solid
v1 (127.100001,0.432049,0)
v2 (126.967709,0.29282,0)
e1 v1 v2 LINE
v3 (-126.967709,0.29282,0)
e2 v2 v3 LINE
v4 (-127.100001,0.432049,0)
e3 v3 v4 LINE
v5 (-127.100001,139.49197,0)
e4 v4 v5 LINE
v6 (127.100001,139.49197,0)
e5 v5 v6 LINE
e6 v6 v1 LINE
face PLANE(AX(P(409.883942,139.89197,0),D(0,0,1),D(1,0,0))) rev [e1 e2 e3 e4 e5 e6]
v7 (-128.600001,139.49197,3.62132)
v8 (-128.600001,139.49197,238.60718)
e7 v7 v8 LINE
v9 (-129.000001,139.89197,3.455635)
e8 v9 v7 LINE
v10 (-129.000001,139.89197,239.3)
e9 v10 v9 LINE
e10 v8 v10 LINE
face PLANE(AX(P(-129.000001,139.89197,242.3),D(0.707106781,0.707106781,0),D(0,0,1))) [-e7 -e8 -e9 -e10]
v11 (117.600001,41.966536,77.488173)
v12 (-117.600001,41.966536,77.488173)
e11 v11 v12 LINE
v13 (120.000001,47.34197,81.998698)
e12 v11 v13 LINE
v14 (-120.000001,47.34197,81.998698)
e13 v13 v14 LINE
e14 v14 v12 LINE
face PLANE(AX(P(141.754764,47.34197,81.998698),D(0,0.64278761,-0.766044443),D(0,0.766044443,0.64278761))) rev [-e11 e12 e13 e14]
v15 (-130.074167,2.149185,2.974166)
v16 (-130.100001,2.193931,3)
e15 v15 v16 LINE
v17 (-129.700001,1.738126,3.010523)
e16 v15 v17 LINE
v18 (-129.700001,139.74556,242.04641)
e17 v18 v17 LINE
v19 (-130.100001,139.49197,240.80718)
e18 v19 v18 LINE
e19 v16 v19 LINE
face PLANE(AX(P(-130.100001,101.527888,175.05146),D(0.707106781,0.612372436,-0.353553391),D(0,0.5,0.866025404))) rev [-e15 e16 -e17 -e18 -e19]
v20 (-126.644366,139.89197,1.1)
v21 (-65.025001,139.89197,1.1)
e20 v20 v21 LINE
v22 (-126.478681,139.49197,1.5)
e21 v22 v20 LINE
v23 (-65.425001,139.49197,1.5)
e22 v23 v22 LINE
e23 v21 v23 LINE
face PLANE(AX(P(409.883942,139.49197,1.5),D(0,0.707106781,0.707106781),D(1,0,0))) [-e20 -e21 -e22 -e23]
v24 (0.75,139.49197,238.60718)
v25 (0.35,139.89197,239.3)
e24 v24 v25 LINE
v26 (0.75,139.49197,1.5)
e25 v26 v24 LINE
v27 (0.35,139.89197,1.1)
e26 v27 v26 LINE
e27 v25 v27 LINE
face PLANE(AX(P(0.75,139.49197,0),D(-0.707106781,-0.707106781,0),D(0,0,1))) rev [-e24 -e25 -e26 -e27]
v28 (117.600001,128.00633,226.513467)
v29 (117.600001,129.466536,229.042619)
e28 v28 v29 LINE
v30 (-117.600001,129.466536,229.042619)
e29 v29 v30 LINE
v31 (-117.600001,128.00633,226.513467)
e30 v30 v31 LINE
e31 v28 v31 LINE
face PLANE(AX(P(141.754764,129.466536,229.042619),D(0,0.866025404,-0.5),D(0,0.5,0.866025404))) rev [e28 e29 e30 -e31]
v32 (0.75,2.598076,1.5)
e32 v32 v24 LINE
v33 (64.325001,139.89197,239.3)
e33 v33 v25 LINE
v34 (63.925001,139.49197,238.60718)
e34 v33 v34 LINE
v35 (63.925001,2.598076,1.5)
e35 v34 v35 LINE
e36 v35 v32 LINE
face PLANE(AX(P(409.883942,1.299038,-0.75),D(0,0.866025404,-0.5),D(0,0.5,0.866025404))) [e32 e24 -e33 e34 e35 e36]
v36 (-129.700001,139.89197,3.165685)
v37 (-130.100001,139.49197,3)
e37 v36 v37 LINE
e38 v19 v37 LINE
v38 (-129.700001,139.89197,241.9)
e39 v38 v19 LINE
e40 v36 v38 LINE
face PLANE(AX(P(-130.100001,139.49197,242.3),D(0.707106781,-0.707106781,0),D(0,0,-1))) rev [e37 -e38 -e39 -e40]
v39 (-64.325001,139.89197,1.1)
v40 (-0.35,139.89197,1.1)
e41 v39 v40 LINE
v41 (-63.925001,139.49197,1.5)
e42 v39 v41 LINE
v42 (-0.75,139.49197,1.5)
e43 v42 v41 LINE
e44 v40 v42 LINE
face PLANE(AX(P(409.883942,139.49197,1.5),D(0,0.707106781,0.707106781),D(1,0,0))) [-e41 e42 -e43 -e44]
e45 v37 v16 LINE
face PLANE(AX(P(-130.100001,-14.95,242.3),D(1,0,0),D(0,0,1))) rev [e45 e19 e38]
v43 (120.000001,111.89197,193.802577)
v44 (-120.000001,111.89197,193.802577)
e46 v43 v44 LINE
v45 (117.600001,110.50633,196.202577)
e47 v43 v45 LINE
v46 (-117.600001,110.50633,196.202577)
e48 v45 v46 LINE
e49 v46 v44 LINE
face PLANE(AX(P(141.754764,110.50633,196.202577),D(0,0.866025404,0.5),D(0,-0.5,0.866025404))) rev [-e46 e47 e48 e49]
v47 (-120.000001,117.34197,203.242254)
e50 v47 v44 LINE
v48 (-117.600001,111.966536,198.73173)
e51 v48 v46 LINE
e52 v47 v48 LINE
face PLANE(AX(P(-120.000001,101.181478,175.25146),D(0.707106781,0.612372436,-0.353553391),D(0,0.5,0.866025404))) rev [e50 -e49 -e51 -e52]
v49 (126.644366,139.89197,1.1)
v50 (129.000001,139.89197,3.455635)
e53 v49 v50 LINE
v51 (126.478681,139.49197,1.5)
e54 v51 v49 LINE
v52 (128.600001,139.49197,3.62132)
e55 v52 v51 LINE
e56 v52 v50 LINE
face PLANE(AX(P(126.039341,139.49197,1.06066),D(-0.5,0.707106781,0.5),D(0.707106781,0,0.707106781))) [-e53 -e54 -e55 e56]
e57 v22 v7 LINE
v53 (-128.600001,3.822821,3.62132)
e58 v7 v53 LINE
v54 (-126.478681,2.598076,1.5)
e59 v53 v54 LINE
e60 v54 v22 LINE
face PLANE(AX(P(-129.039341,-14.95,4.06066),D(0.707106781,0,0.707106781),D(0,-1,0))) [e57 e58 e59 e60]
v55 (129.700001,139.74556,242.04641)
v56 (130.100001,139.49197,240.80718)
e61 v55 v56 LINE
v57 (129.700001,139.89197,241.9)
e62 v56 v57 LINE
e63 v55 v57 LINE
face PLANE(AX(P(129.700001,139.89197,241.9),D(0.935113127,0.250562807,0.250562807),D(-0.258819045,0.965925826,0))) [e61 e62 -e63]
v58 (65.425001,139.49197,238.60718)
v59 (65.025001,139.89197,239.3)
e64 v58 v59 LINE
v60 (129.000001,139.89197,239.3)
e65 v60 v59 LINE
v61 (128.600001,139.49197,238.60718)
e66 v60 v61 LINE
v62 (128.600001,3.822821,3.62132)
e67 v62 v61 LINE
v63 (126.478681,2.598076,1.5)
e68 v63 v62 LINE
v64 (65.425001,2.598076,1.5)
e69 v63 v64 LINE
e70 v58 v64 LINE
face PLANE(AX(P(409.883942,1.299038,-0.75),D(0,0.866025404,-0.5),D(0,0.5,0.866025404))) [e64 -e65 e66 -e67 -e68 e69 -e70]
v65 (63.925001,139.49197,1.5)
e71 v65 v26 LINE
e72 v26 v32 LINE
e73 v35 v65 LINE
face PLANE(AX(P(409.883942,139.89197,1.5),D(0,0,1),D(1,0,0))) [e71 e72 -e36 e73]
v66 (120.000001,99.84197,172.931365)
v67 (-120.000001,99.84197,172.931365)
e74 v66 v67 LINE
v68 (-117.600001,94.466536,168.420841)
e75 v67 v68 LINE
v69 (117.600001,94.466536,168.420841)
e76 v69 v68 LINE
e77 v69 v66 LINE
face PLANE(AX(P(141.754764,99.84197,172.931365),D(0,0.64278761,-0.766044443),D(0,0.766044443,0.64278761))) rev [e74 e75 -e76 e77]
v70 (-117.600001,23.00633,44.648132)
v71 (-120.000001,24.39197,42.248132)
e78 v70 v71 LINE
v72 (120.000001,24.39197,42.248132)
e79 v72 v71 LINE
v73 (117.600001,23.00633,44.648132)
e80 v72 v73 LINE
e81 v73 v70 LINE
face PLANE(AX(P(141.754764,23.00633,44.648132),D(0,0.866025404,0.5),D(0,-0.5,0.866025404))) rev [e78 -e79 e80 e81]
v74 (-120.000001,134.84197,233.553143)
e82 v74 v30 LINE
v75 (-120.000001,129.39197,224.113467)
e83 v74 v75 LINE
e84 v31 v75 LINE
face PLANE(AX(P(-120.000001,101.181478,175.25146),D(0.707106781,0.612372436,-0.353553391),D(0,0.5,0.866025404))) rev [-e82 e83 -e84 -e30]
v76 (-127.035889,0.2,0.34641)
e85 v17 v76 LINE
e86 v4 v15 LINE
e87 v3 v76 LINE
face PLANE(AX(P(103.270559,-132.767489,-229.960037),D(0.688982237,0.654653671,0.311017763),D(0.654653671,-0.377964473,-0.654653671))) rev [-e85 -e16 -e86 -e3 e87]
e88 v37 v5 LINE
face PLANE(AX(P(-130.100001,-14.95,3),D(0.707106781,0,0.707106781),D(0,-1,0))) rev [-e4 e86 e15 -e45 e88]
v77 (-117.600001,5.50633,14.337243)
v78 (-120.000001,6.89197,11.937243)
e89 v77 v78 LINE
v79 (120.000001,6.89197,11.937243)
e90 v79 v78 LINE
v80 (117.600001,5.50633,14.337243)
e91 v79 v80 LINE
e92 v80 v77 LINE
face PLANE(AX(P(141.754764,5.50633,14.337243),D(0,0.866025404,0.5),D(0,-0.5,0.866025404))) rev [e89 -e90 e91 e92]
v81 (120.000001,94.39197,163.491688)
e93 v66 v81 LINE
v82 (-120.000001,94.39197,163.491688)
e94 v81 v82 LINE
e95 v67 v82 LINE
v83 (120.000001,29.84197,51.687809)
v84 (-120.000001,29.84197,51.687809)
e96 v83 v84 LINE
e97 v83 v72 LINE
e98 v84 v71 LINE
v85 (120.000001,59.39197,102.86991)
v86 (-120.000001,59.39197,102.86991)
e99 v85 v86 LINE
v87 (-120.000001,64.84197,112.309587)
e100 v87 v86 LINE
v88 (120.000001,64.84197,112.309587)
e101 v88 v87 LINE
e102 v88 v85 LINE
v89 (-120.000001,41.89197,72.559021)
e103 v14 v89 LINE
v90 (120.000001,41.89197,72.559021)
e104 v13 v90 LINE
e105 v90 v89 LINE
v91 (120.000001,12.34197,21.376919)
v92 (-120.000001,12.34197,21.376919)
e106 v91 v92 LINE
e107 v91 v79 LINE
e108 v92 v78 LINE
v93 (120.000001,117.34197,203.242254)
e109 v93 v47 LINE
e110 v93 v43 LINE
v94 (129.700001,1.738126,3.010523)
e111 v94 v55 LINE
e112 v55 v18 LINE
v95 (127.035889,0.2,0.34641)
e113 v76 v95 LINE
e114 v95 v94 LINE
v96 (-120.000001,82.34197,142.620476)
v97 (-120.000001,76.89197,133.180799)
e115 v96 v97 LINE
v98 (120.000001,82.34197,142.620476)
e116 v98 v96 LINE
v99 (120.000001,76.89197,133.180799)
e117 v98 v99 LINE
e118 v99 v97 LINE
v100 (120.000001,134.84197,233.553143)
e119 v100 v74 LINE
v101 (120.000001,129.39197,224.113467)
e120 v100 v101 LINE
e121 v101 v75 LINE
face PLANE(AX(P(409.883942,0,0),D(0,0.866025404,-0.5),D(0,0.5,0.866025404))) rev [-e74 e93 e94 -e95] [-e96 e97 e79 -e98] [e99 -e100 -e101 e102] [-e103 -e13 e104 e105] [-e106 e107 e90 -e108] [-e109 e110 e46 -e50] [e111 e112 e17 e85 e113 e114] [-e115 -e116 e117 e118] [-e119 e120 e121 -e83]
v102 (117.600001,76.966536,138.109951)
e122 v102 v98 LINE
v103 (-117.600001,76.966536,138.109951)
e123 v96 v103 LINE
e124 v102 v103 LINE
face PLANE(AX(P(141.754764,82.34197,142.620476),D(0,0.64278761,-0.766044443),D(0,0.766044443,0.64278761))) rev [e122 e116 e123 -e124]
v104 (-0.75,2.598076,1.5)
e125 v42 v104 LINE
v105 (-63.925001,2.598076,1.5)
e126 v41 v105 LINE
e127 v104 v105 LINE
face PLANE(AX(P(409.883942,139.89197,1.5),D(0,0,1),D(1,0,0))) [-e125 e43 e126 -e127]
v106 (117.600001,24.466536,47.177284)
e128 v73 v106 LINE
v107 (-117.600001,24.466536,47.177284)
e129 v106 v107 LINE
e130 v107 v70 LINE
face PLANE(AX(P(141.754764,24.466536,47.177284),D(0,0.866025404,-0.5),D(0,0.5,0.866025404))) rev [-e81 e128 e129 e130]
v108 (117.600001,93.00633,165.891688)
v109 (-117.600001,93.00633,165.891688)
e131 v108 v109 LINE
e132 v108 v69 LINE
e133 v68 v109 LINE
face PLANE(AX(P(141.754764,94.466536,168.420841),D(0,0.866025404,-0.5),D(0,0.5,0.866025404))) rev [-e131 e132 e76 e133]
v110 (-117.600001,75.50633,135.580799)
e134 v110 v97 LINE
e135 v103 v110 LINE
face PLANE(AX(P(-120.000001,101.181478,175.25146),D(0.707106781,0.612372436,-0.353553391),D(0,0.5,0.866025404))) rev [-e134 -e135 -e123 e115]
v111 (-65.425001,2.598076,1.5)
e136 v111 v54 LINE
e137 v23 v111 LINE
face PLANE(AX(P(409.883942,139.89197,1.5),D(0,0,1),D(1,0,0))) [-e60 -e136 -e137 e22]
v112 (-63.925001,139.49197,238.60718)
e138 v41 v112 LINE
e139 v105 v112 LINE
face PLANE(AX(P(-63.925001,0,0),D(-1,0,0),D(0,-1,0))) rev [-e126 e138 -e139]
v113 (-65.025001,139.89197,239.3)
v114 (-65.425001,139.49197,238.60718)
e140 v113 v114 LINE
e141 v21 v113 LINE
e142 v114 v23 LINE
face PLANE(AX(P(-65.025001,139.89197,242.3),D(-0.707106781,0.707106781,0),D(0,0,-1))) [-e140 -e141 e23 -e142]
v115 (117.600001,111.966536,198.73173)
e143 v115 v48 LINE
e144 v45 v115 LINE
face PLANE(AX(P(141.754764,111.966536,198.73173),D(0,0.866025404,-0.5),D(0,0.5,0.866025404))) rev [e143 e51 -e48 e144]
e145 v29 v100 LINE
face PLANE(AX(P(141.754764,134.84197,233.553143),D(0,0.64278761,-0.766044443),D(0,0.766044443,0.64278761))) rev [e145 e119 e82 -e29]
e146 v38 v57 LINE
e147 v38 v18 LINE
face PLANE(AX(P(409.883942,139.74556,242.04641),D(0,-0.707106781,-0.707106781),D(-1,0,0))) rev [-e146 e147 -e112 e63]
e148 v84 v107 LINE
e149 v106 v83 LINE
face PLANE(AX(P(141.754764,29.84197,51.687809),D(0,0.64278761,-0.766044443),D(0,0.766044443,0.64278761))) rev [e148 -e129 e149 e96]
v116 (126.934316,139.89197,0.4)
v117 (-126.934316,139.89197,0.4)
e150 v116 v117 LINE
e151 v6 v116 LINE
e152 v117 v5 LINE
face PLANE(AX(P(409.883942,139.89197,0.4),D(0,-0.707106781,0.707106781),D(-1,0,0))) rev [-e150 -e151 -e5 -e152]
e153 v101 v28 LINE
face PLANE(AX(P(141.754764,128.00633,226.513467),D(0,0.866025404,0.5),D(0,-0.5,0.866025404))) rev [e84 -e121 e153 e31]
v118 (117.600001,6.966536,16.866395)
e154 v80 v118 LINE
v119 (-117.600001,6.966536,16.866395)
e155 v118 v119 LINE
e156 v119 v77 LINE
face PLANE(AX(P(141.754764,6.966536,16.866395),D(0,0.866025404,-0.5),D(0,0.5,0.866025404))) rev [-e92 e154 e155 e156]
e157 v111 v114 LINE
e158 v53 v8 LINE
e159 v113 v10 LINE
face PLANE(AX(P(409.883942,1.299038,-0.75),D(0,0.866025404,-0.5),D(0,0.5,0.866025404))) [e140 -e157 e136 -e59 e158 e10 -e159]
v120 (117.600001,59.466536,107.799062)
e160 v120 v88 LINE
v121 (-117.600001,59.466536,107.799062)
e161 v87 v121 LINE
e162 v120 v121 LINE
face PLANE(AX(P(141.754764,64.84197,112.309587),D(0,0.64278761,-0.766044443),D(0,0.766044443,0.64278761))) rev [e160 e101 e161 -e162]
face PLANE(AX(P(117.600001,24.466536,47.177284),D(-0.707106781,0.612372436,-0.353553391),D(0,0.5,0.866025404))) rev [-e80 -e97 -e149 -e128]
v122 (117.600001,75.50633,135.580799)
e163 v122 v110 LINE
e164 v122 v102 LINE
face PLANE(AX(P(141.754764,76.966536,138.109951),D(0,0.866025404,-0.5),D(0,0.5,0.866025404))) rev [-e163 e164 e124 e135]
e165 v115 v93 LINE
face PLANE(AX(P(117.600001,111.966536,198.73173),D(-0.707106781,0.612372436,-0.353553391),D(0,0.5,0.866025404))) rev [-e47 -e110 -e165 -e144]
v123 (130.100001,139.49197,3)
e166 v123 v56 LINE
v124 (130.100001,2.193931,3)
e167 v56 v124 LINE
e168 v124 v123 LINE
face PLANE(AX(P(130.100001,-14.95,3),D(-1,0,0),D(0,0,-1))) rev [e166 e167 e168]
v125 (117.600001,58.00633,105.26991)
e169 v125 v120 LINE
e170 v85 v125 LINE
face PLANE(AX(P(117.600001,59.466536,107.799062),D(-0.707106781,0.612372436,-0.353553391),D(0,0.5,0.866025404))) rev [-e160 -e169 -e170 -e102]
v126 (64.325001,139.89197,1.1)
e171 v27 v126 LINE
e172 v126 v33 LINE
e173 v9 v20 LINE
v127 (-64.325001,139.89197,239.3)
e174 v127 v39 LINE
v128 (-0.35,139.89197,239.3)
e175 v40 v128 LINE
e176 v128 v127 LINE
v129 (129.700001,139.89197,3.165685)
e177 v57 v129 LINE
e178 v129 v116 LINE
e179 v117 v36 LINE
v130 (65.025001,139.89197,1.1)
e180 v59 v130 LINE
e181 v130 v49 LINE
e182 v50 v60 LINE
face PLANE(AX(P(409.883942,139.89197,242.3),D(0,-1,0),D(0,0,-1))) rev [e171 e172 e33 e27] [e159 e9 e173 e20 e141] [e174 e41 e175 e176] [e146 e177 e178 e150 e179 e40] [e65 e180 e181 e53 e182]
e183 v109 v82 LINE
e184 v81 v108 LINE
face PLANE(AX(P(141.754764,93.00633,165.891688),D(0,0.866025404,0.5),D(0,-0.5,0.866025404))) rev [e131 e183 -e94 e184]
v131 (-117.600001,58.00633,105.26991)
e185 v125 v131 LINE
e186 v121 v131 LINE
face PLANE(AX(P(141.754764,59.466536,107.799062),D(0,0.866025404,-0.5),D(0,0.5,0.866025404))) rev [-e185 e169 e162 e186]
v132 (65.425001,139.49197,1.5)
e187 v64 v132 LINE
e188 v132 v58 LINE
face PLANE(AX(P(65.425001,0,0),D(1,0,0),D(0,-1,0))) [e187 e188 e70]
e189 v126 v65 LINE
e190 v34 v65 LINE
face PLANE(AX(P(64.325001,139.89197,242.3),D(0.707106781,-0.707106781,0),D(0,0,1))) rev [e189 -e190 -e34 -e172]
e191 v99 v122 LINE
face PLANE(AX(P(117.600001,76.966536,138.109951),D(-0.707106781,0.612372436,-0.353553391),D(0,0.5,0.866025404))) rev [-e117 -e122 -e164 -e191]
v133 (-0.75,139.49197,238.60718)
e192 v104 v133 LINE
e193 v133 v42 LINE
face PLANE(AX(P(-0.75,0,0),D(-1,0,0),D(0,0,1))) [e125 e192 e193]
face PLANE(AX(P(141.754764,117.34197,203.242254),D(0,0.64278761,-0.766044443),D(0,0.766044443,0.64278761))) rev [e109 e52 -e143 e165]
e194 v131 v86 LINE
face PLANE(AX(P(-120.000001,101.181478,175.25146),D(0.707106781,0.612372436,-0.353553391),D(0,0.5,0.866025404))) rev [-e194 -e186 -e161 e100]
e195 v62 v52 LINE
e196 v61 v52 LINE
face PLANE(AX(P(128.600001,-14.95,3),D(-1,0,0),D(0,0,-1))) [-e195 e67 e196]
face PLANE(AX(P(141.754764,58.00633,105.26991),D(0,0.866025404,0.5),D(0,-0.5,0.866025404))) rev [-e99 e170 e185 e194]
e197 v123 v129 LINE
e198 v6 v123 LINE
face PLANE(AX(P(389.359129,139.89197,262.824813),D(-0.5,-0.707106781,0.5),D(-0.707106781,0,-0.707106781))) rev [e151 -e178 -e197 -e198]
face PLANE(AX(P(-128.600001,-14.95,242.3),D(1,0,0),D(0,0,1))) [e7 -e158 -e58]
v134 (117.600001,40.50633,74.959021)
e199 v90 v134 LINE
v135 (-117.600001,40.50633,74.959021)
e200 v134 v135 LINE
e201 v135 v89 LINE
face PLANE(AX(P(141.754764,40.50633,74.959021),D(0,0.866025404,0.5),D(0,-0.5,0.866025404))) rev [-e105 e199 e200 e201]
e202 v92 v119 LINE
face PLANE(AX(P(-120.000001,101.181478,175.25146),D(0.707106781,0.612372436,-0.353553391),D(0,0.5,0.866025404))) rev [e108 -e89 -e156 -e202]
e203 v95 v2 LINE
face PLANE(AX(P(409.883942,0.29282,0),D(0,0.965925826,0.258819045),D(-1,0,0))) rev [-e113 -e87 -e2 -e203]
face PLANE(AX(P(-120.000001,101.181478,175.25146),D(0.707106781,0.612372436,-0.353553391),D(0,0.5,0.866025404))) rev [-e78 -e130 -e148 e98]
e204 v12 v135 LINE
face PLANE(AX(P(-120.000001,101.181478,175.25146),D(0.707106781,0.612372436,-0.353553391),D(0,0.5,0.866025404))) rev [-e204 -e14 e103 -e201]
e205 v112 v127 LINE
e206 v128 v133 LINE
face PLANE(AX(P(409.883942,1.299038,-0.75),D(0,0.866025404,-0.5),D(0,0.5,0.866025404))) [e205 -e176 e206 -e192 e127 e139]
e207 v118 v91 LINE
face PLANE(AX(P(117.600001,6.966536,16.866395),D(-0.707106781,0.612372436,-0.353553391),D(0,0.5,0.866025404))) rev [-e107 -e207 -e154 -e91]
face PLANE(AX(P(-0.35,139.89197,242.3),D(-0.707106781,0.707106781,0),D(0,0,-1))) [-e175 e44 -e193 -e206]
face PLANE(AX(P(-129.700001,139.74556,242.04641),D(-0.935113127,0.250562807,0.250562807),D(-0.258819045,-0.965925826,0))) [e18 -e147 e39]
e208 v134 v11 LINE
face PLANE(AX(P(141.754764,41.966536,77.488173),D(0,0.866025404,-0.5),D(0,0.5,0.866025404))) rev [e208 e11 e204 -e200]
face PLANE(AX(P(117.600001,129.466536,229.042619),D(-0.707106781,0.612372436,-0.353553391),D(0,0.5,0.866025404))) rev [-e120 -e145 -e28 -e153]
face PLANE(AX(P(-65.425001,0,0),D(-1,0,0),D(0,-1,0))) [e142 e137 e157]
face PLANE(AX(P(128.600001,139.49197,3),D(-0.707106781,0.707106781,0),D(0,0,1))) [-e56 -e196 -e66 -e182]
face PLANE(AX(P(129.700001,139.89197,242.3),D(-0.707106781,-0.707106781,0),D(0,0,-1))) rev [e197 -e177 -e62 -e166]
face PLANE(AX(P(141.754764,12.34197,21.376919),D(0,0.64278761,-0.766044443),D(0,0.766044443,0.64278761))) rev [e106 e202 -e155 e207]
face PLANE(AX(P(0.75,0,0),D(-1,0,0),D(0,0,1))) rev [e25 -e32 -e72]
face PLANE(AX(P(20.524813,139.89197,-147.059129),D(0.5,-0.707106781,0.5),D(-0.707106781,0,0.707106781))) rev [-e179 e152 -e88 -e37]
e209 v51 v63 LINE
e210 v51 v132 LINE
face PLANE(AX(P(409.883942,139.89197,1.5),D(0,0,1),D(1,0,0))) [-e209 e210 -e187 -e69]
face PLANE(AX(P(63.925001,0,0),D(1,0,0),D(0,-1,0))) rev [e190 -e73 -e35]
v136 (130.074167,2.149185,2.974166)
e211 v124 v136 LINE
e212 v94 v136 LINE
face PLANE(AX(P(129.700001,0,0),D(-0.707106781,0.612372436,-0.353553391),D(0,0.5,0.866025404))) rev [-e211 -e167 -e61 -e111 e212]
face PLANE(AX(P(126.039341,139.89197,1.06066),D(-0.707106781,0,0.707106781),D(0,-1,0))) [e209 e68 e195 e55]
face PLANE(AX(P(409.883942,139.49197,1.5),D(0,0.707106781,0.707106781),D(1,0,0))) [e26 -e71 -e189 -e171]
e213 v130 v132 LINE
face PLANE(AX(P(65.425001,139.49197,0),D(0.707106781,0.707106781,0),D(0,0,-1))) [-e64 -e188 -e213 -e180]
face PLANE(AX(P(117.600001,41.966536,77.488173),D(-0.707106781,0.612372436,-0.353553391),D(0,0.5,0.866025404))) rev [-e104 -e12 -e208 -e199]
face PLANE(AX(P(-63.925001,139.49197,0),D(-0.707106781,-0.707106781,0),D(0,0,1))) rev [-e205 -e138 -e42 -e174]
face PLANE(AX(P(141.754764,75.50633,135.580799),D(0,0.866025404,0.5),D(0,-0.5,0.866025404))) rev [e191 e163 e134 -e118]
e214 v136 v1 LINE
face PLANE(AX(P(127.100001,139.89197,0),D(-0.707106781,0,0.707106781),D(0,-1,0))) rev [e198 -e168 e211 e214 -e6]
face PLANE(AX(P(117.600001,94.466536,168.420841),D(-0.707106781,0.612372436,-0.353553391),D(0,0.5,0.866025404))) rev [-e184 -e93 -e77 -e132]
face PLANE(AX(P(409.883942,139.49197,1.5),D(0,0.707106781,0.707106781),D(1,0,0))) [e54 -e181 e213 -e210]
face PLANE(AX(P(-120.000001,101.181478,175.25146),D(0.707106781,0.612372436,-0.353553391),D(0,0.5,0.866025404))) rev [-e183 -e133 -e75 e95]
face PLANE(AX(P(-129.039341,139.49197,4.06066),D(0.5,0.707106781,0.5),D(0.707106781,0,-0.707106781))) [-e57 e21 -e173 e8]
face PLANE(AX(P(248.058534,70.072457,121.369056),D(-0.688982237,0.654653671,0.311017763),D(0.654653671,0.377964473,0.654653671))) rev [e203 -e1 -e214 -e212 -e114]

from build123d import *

# Parameters (mm, degrees)
BOSS_EXTRUDE1_DEPTH                = 130.100001
BOSS_EXTRUDE1_DEPTH_BACK           = 130.100001
BACK_CORNER_CHAMS_SIZE             = 3
COMPARTMENT_T                      = -1.5
STACKER_RIB_DEPTH                  = 120.000001
STACKER_RIB_CHAM_SIZE              = 2.4
LPATTERN1_COUNT                    = 8
LPATTERN1_PITCH                    = 35
STACKER_RIB_CHAM_OF_LPATTERN1_SIZE = 2.4
CENTER_DIVIDER_DEPTH               = 0.75
F_4_COMPARTMENT_LEFT_DIVIDER_DEPTH = 0.75
F_4_COMPARTMENT_DEBURS_SIZE        = 0.4


# Some blends are built 0.0001 mm under size
with BuildPart() as part:
    # Sketch1 → Boss-Extrude1 (new, two sides: drawn at the far end of the back side and taken through both)
    with BuildSketch(Plane(origin=(0, 0, 0), x_dir=(0, 0, -1), z_dir=(1, 0, 0)).offset(-BOSS_EXTRUDE1_DEPTH_BACK)):
        Polygon((0, 139.891970225), (0, 0), (-242.3, 139.891970225), align=None)
    extrude(amount=BOSS_EXTRUDE1_DEPTH + BOSS_EXTRUDE1_DEPTH_BACK)

    # Back Corner Chams
    back_corner_chams_edges = [part.edges().sort_by_distance(p)[0] for p in [
        (-130.100001, 69.945985112, 0),
        (130.100001, 69.945985112, 0),
    ]]
    chamfer(back_corner_chams_edges, length=BACK_CORNER_CHAMS_SIZE)

    # Compartment
    compartment_openings = [part.faces().sort_by_distance(p)[0] for p in [
        (0, 139.891970225, 121.167154086),
    ]]
    offset(amount=COMPARTMENT_T, openings=compartment_openings, kind=Kind.INTERSECTION)

    # Sketch7 → Stacker Rib (add, symmetric)
    with BuildSketch(Plane(origin=(0, 0, 0), x_dir=(0, 0, -1), z_dir=(1, 0, 0))):
        Polygon((-233.553143422, 134.841970225), (-229.042618842, 129.466536352), (-226.513466521, 128.006329579), (-224.113466521, 129.391970225), align=None)
    stacker_rib = extrude(amount=STACKER_RIB_DEPTH, both=True)

    # Stacker Rib Cham
    stacker_rib_cham_edges = [part.edges().sort_by_distance(p)[0] for p in [
        (120.000001, 128.736432965, 227.778042681),
        (-120.000001, 128.736432965, 227.778042681),
    ]]
    chamfer(stacker_rib_cham_edges, length=STACKER_RIB_CHAM_SIZE - 0.0001)  # a hair under: the kernel refuses the full size

    # LPattern1: Stacker Rib ×8
    with Locations(*[Vector(-2.642697158742682e-15, -0.5000000000000042, -0.8660254037844363) * (i * LPATTERN1_PITCH) for i in range(1, LPATTERN1_COUNT)]):
        add(stacker_rib)

    # Stacker Rib Cham of LPattern1
    stacker_rib_cham_of_lpattern1_edges = [part.edges().sort_by_distance(p)[0] for p in [
        (120.000001, 111.236432965, 197.467153549),
        (-120.000001, 111.236432965, 197.467153549),
        (120.000001, 93.736432965, 167.156264416),
        (-120.000001, 93.736432965, 167.156264416),
        (120.000001, 76.236432965, 136.845375284),
        (-120.000001, 76.236432965, 136.845375284),
        (120.000001, 58.736432965, 106.534486151),
        (-120.000001, 58.736432965, 106.534486151),
        (120.000001, 41.236432965, 76.223597019),
        (-120.000001, 41.236432965, 76.223597019),
        (120.000001, 23.736432965, 45.912707887),
        (-120.000001, 23.736432965, 45.912707887),
        (120.000001, 6.236432965, 15.601818754),
        (-120.000001, 6.236432965, 15.601818754),
    ]]
    chamfer(stacker_rib_cham_of_lpattern1_edges, length=STACKER_RIB_CHAM_OF_LPATTERN1_SIZE - 0.0001)  # a hair under: the kernel refuses the full size

    # Sketch3 → Center Divider (add, symmetric)
    with BuildSketch(Plane(origin=(0, 0, 0), x_dir=(0, 0, -1), z_dir=(1, 0, 0))):
        Polygon((0, 0), (0, 139.891970225), (-242.3, 139.891970225), align=None)
    extrude(amount=CENTER_DIVIDER_DEPTH, both=True)

    # Sketch6 → 4 Compartment Left Divider (add, symmetric)
    with BuildSketch(Plane(origin=(-64.67500064, 0, 0), x_dir=(0, 0, -1), z_dir=(1, 0, 0))):
        Polygon((0, 0), (0, 139.891970225), (-242.3, 139.891970225), align=None)
    f_4_compartment_left_divider = extrude(amount=F_4_COMPARTMENT_LEFT_DIVIDER_DEPTH, both=True)

    # 4 Compartment Right Divider: 4 Compartment Left Divider across plane
    add(f_4_compartment_left_divider.mirror(Plane(origin=(0, 0, 0), x_dir=(0, 0, 1), z_dir=(1, 0, 0))))

    # Body Deburs
    # the kernel refuses this chamfer: 0.4, 0.310325843, 0.292820323 mm, written as the material it takes off along each edge
    with BuildSketch(Plane(origin=(129.833334333, 139.709833504, 241.584529946), x_dir=(0.30151134457777734, -0.1911505329331018, -0.9341051240895171), z_dir=(0.9351131265310314, 0.25056280708570355, 0.25056280708575224))) as body_deburs_piece_1:
        Polygon((-0.478475339, -0.058726892), (0.848174577, -0.058726892), (-0.369699238, 0.117453784), align=None)
    extrude(amount=0.521697411, mode=Mode.SUBTRACT)
    with BuildSketch(Plane(origin=(-129.833334333, 139.709833504, 241.584529946), x_dir=(-0.30151134457777734, -0.1911505329331018, -0.9341051240895171), z_dir=(-0.9351131265310314, 0.25056280708570355, 0.25056280708575224))) as body_deburs_piece_2:
        Polygon((-0.478475339, 0.058726892), (0.848174577, 0.058726892), (-0.369699238, -0.117453784), align=None)
    extrude(amount=0.521697411, mode=Mode.SUBTRACT)
    with BuildSketch(Plane(origin=(127.507353852, 139.891970225, 1.5), x_dir=(0, 0.02749587661059753, -0.9996219169112964), z_dir=(-1, 0, 0))) as body_deburs_piece_3_section:
        with BuildLine():
            Line((0.411469278, 0), (-0.022618862, 0.410847117))
            Line((-0.022618862, 0.410847117), (-0.030615837, 0.41062715))
            ThreePointArc((-0.030615837, 0.41062715), (-0.013651691, 0.205359132), (-0.007996975, -0.000219967))
            Line((-0.007996975, -0.000219967), (0.000219967, -0.007996975))
            ThreePointArc((0.000219967, -0.007996975), (0.205799066, -0.00234226), (0.411689245, -0.007996975))
            Line((0.411689245, -0.007996975), (0.411469278, 0))
        make_face()
    body_deburs_piece_3 = extrude(amount=62.082353212, mode=Mode.PRIVATE)
    body_deburs_piece_3 = split(body_deburs_piece_3, bisect_by=Plane(origin=(111.116447648, 139.759963614, -13.862233009), z_dir=(-0.7071067811865476, 0, 0.7071067811865476)), keep=Keep.TOP, mode=Mode.PRIVATE)
    add(body_deburs_piece_3, mode=Mode.SUBTRACT)
    with BuildSketch(Plane(origin=(125.751298864, 139.891970225, 0.772618208), x_dir=(0.7068394360706732, 0.027495876610596933, -0.7068394360706733), z_dir=(0.7071067811865476, 0, 0.7071067811865476))) as body_deburs_piece_4_section:
        with BuildLine():
            Line((0.411469278, 0), (-0.022618862, -0.410847117))
            Line((-0.022618862, -0.410847117), (-0.030615837, -0.41062715))
            ThreePointArc((-0.030615837, -0.41062715), (-0.013651691, -0.205359132), (-0.007996975, 0.000219967))
            Line((-0.007996975, 0.000219967), (0.000219967, 0.007996975))
            ThreePointArc((0.000219967, 0.007996975), (0.205799066, 0.00234226), (0.411689245, 0.007996975))
            Line((0.411689245, 0.007996975), (0.411469278, 0))
        make_face()
    body_deburs_piece_4 = extrude(amount=5.05734639, mode=Mode.PRIVATE)
    body_deburs_piece_4 = split(body_deburs_piece_4, bisect_by=Plane(origin=(128.600001, 139.756082402, 2.472631953), z_dir=(-1, 0, 0)), keep=Keep.TOP, mode=Mode.PRIVATE)
    body_deburs_piece_4 = split(body_deburs_piece_4, bisect_by=Plane(origin=(127.627369047, 139.756082402, 1.5), z_dir=(0, 0, 1)), keep=Keep.TOP, mode=Mode.PRIVATE)
    add(body_deburs_piece_4, mode=Mode.SUBTRACT)
    with BuildSketch(Plane(origin=(128.600001, 139.891970225, 2.592647148), x_dir=(0.9996219169112964, 0.027495876610595334, 0), z_dir=(0, 0, 1))) as body_deburs_piece_5_section:
        with BuildLine():
            Line((0.411469278, 0), (-0.022618862, -0.410847117))
            Line((-0.022618862, -0.410847117), (-0.030615837, -0.41062715))
            ThreePointArc((-0.030615837, -0.41062715), (-0.013651691, -0.205359132), (-0.007996975, 0.000219967))
            Line((-0.007996975, 0.000219967), (0.000219967, 0.007996975))
            ThreePointArc((0.000219967, 0.007996975), (0.205799066, 0.00234226), (0.411689245, 0.007996975))
            Line((0.411689245, 0.007996975), (0.411469278, 0))
        make_face()
    body_deburs_piece_5 = extrude(amount=237.736026047, mode=Mode.PRIVATE)
    body_deburs_piece_5 = split(body_deburs_piece_5, bisect_by=Plane(origin=(128.731915254, 88.812183478, 150.827214114), z_dir=(0, 0.8660254037844364, -0.5000000000000039)), keep=Keep.TOP, mode=Mode.PRIVATE)
    body_deburs_piece_5 = split(body_deburs_piece_5, bisect_by=Plane(origin=(187.561507061, 139.760104476, 62.582826404), z_dir=(-0.7071067811865476, 0, 0.7071067811865476)), keep=Keep.TOP, mode=Mode.PRIVATE)
    add(body_deburs_piece_5, mode=Mode.SUBTRACT)
    with BuildSketch(Plane(origin=(-125.751298864, 139.891970225, 0.772618208), x_dir=(-0.7068394360706732, 0.027495876610596933, -0.7068394360706733), z_dir=(-0.7071067811865476, 0, 0.7071067811865476))) as body_deburs_piece_6_section:
        with BuildLine():
            Line((0.411469278, 0), (-0.022618862, 0.410847117))
            Line((-0.022618862, 0.410847117), (-0.030615837, 0.41062715))
            ThreePointArc((-0.030615837, 0.41062715), (-0.013651691, 0.205359132), (-0.007996975, -0.000219967))
            Line((-0.007996975, -0.000219967), (0.000219967, -0.007996975))
            ThreePointArc((0.000219967, -0.007996975), (0.205799066, -0.00234226), (0.411689245, -0.007996975))
            Line((0.411689245, -0.007996975), (0.411469278, 0))
        make_face()
    body_deburs_piece_6 = extrude(amount=5.05734639, mode=Mode.PRIVATE)
    body_deburs_piece_6 = split(body_deburs_piece_6, bisect_by=Plane(origin=(-128.600001, 139.756082402, 2.472631953), z_dir=(1, 0, 0)), keep=Keep.TOP, mode=Mode.PRIVATE)
    body_deburs_piece_6 = split(body_deburs_piece_6, bisect_by=Plane(origin=(-127.627369047, 139.756082402, 1.5), z_dir=(0, 0, 1)), keep=Keep.TOP, mode=Mode.PRIVATE)
    add(body_deburs_piece_6, mode=Mode.SUBTRACT)
    with BuildSketch(Plane(origin=(-128.600001, 139.891970225, 2.592647148), x_dir=(-0.9996219169112964, 0.027495876610595334, 0), z_dir=(0, 0, 1))) as body_deburs_piece_7_section:
        with BuildLine():
            Line((0.411469278, 0), (-0.022618862, 0.410847117))
            Line((-0.022618862, 0.410847117), (-0.030615837, 0.41062715))
            ThreePointArc((-0.030615837, 0.41062715), (-0.013651691, 0.205359132), (-0.007996975, -0.000219967))
            Line((-0.007996975, -0.000219967), (0.000219967, -0.007996975))
            ThreePointArc((0.000219967, -0.007996975), (0.205799066, -0.00234226), (0.411689245, -0.007996975))
            Line((0.411689245, -0.007996975), (0.411469278, 0))
        make_face()
    body_deburs_piece_7 = extrude(amount=237.736026047, mode=Mode.PRIVATE)
    body_deburs_piece_7 = split(body_deburs_piece_7, bisect_by=Plane(origin=(-128.731915254, 88.812183478, 150.827214114), z_dir=(0, 0.8660254037844364, -0.5000000000000039)), keep=Keep.TOP, mode=Mode.PRIVATE)
    body_deburs_piece_7 = split(body_deburs_piece_7, bisect_by=Plane(origin=(-187.561507061, 139.760104476, 62.582826404), z_dir=(0.7071067811865476, 0, 0.7071067811865476)), keep=Keep.TOP, mode=Mode.PRIVATE)
    add(body_deburs_piece_7, mode=Mode.SUBTRACT)
    with BuildSketch(Plane(origin=(130.100001, 1.21771421, 2.109142881), x_dir=(-0.9996219169112966, -0.02381212764408988, 0.013747938305293163), z_dir=(0, 0.5000000000000039, 0.8660254037844364))) as body_deburs_piece_8:
        with BuildLine():
            Line((0.411469278, 0), (-0.022618862, -0.410847117))
            Line((-0.022618862, -0.410847117), (-0.030615837, -0.41062715))
            ThreePointArc((-0.030615837, -0.41062715), (-0.013651691, -0.205359132), (-0.007996975, 0.000219967))
            Line((-0.007996975, 0.000219967), (0.000219967, 0.007996975))
            ThreePointArc((0.000219967, 0.007996975), (0.205799066, 0.00234226), (0.411689245, 0.007996975))
            Line((0.411689245, 0.007996975), (0.411469278, 0))
        make_face()
    extrude(amount=278.377185225, mode=Mode.SUBTRACT)
    with BuildSketch(Plane(origin=(130.100001, 139.891970225, 243.328673195), x_dir=(-0.9996219169112964, 0.027495876610595334, 0), z_dir=(0, 0, -1)), Plane(origin=(-130.100001, 139.891970225, 243.328673195), x_dir=(-0.027495876610595337, -0.9996219169112965, 0), z_dir=(0, 0, -1))) as body_deburs_piece_9:
        with BuildLine():
            Line((0.411469278, 0), (-0.022618862, -0.410847117))
            Line((-0.022618862, -0.410847117), (-0.030615837, -0.41062715))
            ThreePointArc((-0.030615837, -0.41062715), (-0.013651691, -0.205359132), (-0.007996975, 0.000219967))
            Line((-0.007996975, 0.000219967), (0.000219967, 0.007996975))
            ThreePointArc((0.000219967, 0.007996975), (0.205799066, 0.00234226), (0.411689245, 0.007996975))
            Line((0.411689245, 0.007996975), (0.411469278, 0))
        make_face()
    extrude(amount=241.35734639, mode=Mode.SUBTRACT)
    with BuildSketch(Plane(origin=(126.372619208, 139.891970225, -0.727381792), x_dir=(-0.7068394360706732, 0.027495876610595566, 0.7068394360706733), z_dir=(0.7071067811865476, 0, 0.7071067811865476)), Plane(origin=(-126.372619208, 139.891970225, -0.727381792), x_dir=(-0.01944252080601816, -0.9996219169112965, -0.019442520806018278), z_dir=(-0.7071067811865476, 0, 0.7071067811865476))) as body_deburs_piece_10:
        with BuildLine():
            Line((0.411469278, 0), (-0.022618862, 0.410847117))
            Line((-0.022618862, 0.410847117), (-0.030615837, 0.41062715))
            ThreePointArc((-0.030615837, 0.41062715), (-0.013651691, 0.205359132), (-0.007996975, -0.000219967))
            Line((-0.007996975, -0.000219967), (0.000219967, -0.007996975))
            ThreePointArc((0.000219967, -0.007996975), (0.205799066, -0.00234226), (0.411689245, -0.007996975))
            Line((0.411689245, -0.007996975), (0.411469278, 0))
        make_face()
    extrude(amount=6.299987077, mode=Mode.SUBTRACT)
    with BuildSketch(Plane(origin=(-128.128674195, 139.891970225, 0), x_dir=(0, -0.9996219169112966, -0.027495876610585723), z_dir=(1, 0, 0))) as body_deburs_piece_11:
        with BuildLine():
            Line((0.411469278, 0), (-0.022618862, -0.410847117))
            Line((-0.022618862, -0.410847117), (-0.030615837, -0.41062715))
            ThreePointArc((-0.030615837, -0.41062715), (-0.013651691, -0.205359132), (-0.007996975, 0.000219967))
            Line((-0.007996975, 0.000219967), (0.000219967, 0.007996975))
            ThreePointArc((0.000219967, 0.007996975), (0.205799066, 0.00234226), (0.411689245, 0.007996975))
            Line((0.411689245, 0.007996975), (0.411469278, 0))
        make_face()
    extrude(amount=256.25734839, mode=Mode.SUBTRACT)
    with BuildSketch(Plane(origin=(-130.100001, 1.21771421, 2.109142881), x_dir=(0.9996219169112966, -0.02381212764408988, 0.013747938305293163), z_dir=(0, 0.5000000000000039, 0.8660254037844364))) as body_deburs_piece_12:
        with BuildLine():
            Line((0.411469278, 0), (-0.022618862, 0.410847117))
            Line((-0.022618862, 0.410847117), (-0.030615837, 0.41062715))
            ThreePointArc((-0.030615837, 0.41062715), (-0.013651691, 0.205359132), (-0.007996975, -0.000219967))
            Line((-0.007996975, -0.000219967), (0.000219967, -0.007996975))
            ThreePointArc((0.000219967, -0.007996975), (0.205799066, -0.00234226), (0.411689245, -0.007996975))
            Line((0.411689245, -0.007996975), (0.411469278, 0))
        make_face()
    extrude(amount=278.377185225, mode=Mode.SUBTRACT)
    with BuildSketch(Plane(origin=(131.128674195, 139.891970225, 242.3), x_dir=(0, -0.5455824869680519, -0.8380571280728751), z_dir=(-1, 0, 0))) as body_deburs_piece_13:
        with BuildLine():
            Line((0.289092619, 0), (0.338531824, -0.23388709))
            Line((0.338531824, -0.23388709), (0.334167164, -0.240591547))
            ThreePointArc((0.334167164, -0.240591547), (0.167987533, -0.118907235), (-0.00436466, -0.006704457))
            Line((-0.00436466, -0.006704457), (0.000427678, 0.00798856))
            ThreePointArc((0.000427678, 0.00798856), (0.144560882, 0.000272204), (0.289520297, 0.00798856))
            Line((0.289520297, 0.00798856), (0.289092619, 0))
        make_face()
    extrude(amount=262.25734839, mode=Mode.SUBTRACT)
    with BuildSketch(Plane(origin=(126.426576317, -0.388801922, -0.673424683), x_dir=(-0.7551298715314874, 0.28717157801696425, 0.5893312836597817), z_dir=(0.6546536707079762, 0.3779644730092306, 0.6546536707079762))) as body_deburs_piece_14:
        with BuildLine():
            Line((0.3172442, 0), (0.116825908, -0.394536024))
            Line((0.116825908, -0.394536024), (0.109220487, -0.39701747))
            ThreePointArc((0.109220487, -0.39701747), (0.056185378, -0.197994811), (-0.007605421, -0.002481446))
            Line((-0.007605421, -0.002481446), (0.000367742, 0.007991543))
            ThreePointArc((0.000367742, 0.007991543), (0.158654668, 0.000707748), (0.317611942, 0.007991543))
            Line((0.317611942, 0.007991543), (0.3172442, 0))
        make_face()
    extrude(amount=6.639922085, mode=Mode.SUBTRACT)
    with BuildSketch(Plane(origin=(-126.426576317, -0.388801922, -0.673424683), x_dir=(0.7551298715314874, 0.2871715780169642, 0.5893312836597817), z_dir=(-0.6546536707079762, 0.3779644730092306, 0.6546536707079762))) as body_deburs_piece_15:
        with BuildLine():
            Line((0.3172442, 0), (0.116825908, 0.394536024))
            Line((0.116825908, 0.394536024), (0.109220487, 0.39701747))
            ThreePointArc((0.109220487, 0.39701747), (0.056185378, 0.197994811), (-0.007605421, 0.002481446))
            Line((-0.007605421, 0.002481446), (0.000367742, -0.007991543))
            ThreePointArc((0.000367742, -0.007991543), (0.158654668, -0.000707748), (0.317611942, -0.007991543))
            Line((0.317611942, -0.007991543), (0.3172442, 0))
        make_face()
    extrude(amount=6.639922085, mode=Mode.SUBTRACT)
    with BuildSketch(Plane(origin=(-128.128674195, 0, 0), x_dir=(0, 0.47599883081156275, 0.879445912530171), z_dir=(1, 0, 0))) as body_deburs_piece_16:
        with BuildLine():
            Line((0.411469278, 0), (0.12776162, -0.268517987))
            Line((0.12776162, -0.268517987), (0.120726053, -0.272325977))
            ThreePointArc((0.120726053, -0.272325977), (0.063641079, -0.134388748), (-0.007035567, -0.003807991))
            Line((-0.007035567, -0.003807991), (0.000219967, 0.007996975))
            ThreePointArc((0.000219967, 0.007996975), (0.205799066, 0.00234226), (0.411689245, 0.007996975))
            Line((0.411689245, 0.007996975), (0.411469278, 0))
        make_face()
    extrude(amount=256.25734839, mode=Mode.SUBTRACT)
    with BuildSketch(Plane(origin=(127.507353852, 139.891970225, 1.5), x_dir=(0, 0.02749587661059753, -0.9996219169112964), z_dir=(-1, 0, 0))) as body_deburs_piece_17a_section:
        with BuildLine():
            Line((0.411469278, 0), (-0.022618862, 0.410847117))
            Line((-0.022618862, 0.410847117), (-0.030615837, 0.41062715))
            ThreePointArc((-0.030615837, 0.41062715), (-0.013651691, 0.205359132), (-0.007996975, -0.000219967))
            Line((-0.007996975, -0.000219967), (0.000219967, -0.007996975))
            ThreePointArc((0.000219967, -0.007996975), (0.205799066, -0.00234226), (0.411689245, -0.007996975))
            Line((0.411689245, -0.007996975), (0.411469278, 0))
        make_face()
    body_deburs_piece_17a = extrude(amount=62.082353212, mode=Mode.PRIVATE)
    body_deburs_piece_17a = split(body_deburs_piece_17a, bisect_by=Plane(origin=(126.630344982, 139.764732975, 1.651664325), z_dir=(0.7071067811865476, 0, -0.7071067811865476)), keep=Keep.TOP, mode=Mode.PRIVATE)
    with BuildSketch(Plane(origin=(125.751298864, 139.891970225, 0.772618208), x_dir=(0.7068394360706732, 0.027495876610596933, -0.7068394360706733), z_dir=(0.7071067811865476, 0, 0.7071067811865476))) as body_deburs_piece_17b_section:
        with BuildLine():
            Line((0.411469278, 0), (-0.022618862, -0.410847117))
            Line((-0.022618862, -0.410847117), (-0.030615837, -0.41062715))
            ThreePointArc((-0.030615837, -0.41062715), (-0.013651691, -0.205359132), (-0.007996975, 0.000219967))
            Line((-0.007996975, 0.000219967), (0.000219967, 0.007996975))
            ThreePointArc((0.000219967, 0.007996975), (0.205799066, 0.00234226), (0.411689245, 0.007996975))
            Line((0.411689245, 0.007996975), (0.411469278, 0))
        make_face()
    body_deburs_piece_17b = extrude(amount=5.05734639, mode=Mode.PRIVATE)
    body_deburs_piece_17b = split(body_deburs_piece_17b, bisect_by=Plane(origin=(126.264194911, 139.764732975, 1.5), z_dir=(0, 0, -1)), keep=Keep.TOP, mode=Mode.PRIVATE)
    body_deburs_piece_17 = body_deburs_piece_17a & body_deburs_piece_17b
    add(body_deburs_piece_17, mode=Mode.SUBTRACT)
    with BuildSketch(Plane(origin=(125.751298864, 139.891970225, 0.772618208), x_dir=(0.7068394360706732, 0.027495876610596933, -0.7068394360706733), z_dir=(0.7071067811865476, 0, 0.7071067811865476))) as body_deburs_piece_18a_section:
        with BuildLine():
            Line((0.411469278, 0), (-0.022618862, -0.410847117))
            Line((-0.022618862, -0.410847117), (-0.030615837, -0.41062715))
            ThreePointArc((-0.030615837, -0.41062715), (-0.013651691, -0.205359132), (-0.007996975, 0.000219967))
            Line((-0.007996975, 0.000219967), (0.000219967, 0.007996975))
            ThreePointArc((0.000219967, 0.007996975), (0.205799066, 0.00234226), (0.411689245, 0.007996975))
            Line((0.411689245, 0.007996975), (0.411469278, 0))
        make_face()
    body_deburs_piece_18a = extrude(amount=5.05734639, mode=Mode.PRIVATE)
    body_deburs_piece_18a = split(body_deburs_piece_18a, bisect_by=Plane(origin=(128.600001, 139.764732975, 3.835806089), z_dir=(1, 0, 0)), keep=Keep.TOP, mode=Mode.PRIVATE)
    with BuildSketch(Plane(origin=(128.600001, 139.891970225, 2.592647148), x_dir=(0.9996219169112964, 0.027495876610595334, 0), z_dir=(0, 0, 1))) as body_deburs_piece_18b_section:
        with BuildLine():
            Line((0.411469278, 0), (-0.022618862, -0.410847117))
            Line((-0.022618862, -0.410847117), (-0.030615837, -0.41062715))
            ThreePointArc((-0.030615837, -0.41062715), (-0.013651691, -0.205359132), (-0.007996975, 0.000219967))
            Line((-0.007996975, 0.000219967), (0.000219967, 0.007996975))
            ThreePointArc((0.000219967, 0.007996975), (0.205799066, 0.00234226), (0.411689245, 0.007996975))
            Line((0.411689245, 0.007996975), (0.411469278, 0))
        make_face()
    body_deburs_piece_18b = extrude(amount=237.736026047, mode=Mode.PRIVATE)
    body_deburs_piece_18b = split(body_deburs_piece_18b, bisect_by=Plane(origin=(128.448336675, 139.764732975, 3.469656018), z_dir=(0.7071067811865476, 0, -0.7071067811865476)), keep=Keep.TOP, mode=Mode.PRIVATE)
    body_deburs_piece_18 = body_deburs_piece_18a & body_deburs_piece_18b
    add(body_deburs_piece_18, mode=Mode.SUBTRACT)
    with BuildSketch(Plane(origin=(-125.751298864, 139.891970225, 0.772618208), x_dir=(-0.7068394360706732, 0.027495876610596933, -0.7068394360706733), z_dir=(-0.7071067811865476, 0, 0.7071067811865476))) as body_deburs_piece_19a_section:
        with BuildLine():
            Line((0.411469278, 0), (-0.022618862, 0.410847117))
            Line((-0.022618862, 0.410847117), (-0.030615837, 0.41062715))
            ThreePointArc((-0.030615837, 0.41062715), (-0.013651691, 0.205359132), (-0.007996975, -0.000219967))
            Line((-0.007996975, -0.000219967), (0.000219967, -0.007996975))
            ThreePointArc((0.000219967, -0.007996975), (0.205799066, -0.00234226), (0.411689245, -0.007996975))
            Line((0.411689245, -0.007996975), (0.411469278, 0))
        make_face()
    body_deburs_piece_19a = extrude(amount=5.05734639, mode=Mode.PRIVATE)
    body_deburs_piece_19a = split(body_deburs_piece_19a, bisect_by=Plane(origin=(-128.600001, 139.764732975, 3.835806089), z_dir=(-1, 0, 0)), keep=Keep.TOP, mode=Mode.PRIVATE)
    with BuildSketch(Plane(origin=(-128.600001, 139.891970225, 2.592647148), x_dir=(-0.9996219169112964, 0.027495876610595334, 0), z_dir=(0, 0, 1))) as body_deburs_piece_19b_section:
        with BuildLine():
            Line((0.411469278, 0), (-0.022618862, 0.410847117))
            Line((-0.022618862, 0.410847117), (-0.030615837, 0.41062715))
            ThreePointArc((-0.030615837, 0.41062715), (-0.013651691, 0.205359132), (-0.007996975, -0.000219967))
            Line((-0.007996975, -0.000219967), (0.000219967, -0.007996975))
            ThreePointArc((0.000219967, -0.007996975), (0.205799066, -0.00234226), (0.411689245, -0.007996975))
            Line((0.411689245, -0.007996975), (0.411469278, 0))
        make_face()
    body_deburs_piece_19b = extrude(amount=237.736026047, mode=Mode.PRIVATE)
    body_deburs_piece_19b = split(body_deburs_piece_19b, bisect_by=Plane(origin=(-128.448336675, 139.764732975, 3.469656018), z_dir=(-0.7071067811865476, 0, -0.7071067811865476)), keep=Keep.TOP, mode=Mode.PRIVATE)
    body_deburs_piece_19 = body_deburs_piece_19a & body_deburs_piece_19b
    add(body_deburs_piece_19, mode=Mode.SUBTRACT)

    # 4 Compartment Deburs
    f_4_compartment_deburs_edges = [part.edges().sort_by_distance(p)[0] for p in [
        (65.42500064, 139.891970225, 120.2),
        (63.92500064, 139.891970225, 120.4),
        (32.33750032, 139.891970225, 1.5),
        (0.75, 139.891970225, 120.4),
        (-0.75, 139.891970225, 120.4),
        (-63.92500064, 139.891970225, 120.4),
        (-32.33750032, 139.891970225, 1.5),
        (-65.42500064, 139.891970225, 120.4),
        (-96.234683361, 139.891970225, 1.5),
    ]]
    chamfer(f_4_compartment_deburs_edges, length=F_4_COMPARTMENT_DEBURS_SIZE)


solid = part.part
